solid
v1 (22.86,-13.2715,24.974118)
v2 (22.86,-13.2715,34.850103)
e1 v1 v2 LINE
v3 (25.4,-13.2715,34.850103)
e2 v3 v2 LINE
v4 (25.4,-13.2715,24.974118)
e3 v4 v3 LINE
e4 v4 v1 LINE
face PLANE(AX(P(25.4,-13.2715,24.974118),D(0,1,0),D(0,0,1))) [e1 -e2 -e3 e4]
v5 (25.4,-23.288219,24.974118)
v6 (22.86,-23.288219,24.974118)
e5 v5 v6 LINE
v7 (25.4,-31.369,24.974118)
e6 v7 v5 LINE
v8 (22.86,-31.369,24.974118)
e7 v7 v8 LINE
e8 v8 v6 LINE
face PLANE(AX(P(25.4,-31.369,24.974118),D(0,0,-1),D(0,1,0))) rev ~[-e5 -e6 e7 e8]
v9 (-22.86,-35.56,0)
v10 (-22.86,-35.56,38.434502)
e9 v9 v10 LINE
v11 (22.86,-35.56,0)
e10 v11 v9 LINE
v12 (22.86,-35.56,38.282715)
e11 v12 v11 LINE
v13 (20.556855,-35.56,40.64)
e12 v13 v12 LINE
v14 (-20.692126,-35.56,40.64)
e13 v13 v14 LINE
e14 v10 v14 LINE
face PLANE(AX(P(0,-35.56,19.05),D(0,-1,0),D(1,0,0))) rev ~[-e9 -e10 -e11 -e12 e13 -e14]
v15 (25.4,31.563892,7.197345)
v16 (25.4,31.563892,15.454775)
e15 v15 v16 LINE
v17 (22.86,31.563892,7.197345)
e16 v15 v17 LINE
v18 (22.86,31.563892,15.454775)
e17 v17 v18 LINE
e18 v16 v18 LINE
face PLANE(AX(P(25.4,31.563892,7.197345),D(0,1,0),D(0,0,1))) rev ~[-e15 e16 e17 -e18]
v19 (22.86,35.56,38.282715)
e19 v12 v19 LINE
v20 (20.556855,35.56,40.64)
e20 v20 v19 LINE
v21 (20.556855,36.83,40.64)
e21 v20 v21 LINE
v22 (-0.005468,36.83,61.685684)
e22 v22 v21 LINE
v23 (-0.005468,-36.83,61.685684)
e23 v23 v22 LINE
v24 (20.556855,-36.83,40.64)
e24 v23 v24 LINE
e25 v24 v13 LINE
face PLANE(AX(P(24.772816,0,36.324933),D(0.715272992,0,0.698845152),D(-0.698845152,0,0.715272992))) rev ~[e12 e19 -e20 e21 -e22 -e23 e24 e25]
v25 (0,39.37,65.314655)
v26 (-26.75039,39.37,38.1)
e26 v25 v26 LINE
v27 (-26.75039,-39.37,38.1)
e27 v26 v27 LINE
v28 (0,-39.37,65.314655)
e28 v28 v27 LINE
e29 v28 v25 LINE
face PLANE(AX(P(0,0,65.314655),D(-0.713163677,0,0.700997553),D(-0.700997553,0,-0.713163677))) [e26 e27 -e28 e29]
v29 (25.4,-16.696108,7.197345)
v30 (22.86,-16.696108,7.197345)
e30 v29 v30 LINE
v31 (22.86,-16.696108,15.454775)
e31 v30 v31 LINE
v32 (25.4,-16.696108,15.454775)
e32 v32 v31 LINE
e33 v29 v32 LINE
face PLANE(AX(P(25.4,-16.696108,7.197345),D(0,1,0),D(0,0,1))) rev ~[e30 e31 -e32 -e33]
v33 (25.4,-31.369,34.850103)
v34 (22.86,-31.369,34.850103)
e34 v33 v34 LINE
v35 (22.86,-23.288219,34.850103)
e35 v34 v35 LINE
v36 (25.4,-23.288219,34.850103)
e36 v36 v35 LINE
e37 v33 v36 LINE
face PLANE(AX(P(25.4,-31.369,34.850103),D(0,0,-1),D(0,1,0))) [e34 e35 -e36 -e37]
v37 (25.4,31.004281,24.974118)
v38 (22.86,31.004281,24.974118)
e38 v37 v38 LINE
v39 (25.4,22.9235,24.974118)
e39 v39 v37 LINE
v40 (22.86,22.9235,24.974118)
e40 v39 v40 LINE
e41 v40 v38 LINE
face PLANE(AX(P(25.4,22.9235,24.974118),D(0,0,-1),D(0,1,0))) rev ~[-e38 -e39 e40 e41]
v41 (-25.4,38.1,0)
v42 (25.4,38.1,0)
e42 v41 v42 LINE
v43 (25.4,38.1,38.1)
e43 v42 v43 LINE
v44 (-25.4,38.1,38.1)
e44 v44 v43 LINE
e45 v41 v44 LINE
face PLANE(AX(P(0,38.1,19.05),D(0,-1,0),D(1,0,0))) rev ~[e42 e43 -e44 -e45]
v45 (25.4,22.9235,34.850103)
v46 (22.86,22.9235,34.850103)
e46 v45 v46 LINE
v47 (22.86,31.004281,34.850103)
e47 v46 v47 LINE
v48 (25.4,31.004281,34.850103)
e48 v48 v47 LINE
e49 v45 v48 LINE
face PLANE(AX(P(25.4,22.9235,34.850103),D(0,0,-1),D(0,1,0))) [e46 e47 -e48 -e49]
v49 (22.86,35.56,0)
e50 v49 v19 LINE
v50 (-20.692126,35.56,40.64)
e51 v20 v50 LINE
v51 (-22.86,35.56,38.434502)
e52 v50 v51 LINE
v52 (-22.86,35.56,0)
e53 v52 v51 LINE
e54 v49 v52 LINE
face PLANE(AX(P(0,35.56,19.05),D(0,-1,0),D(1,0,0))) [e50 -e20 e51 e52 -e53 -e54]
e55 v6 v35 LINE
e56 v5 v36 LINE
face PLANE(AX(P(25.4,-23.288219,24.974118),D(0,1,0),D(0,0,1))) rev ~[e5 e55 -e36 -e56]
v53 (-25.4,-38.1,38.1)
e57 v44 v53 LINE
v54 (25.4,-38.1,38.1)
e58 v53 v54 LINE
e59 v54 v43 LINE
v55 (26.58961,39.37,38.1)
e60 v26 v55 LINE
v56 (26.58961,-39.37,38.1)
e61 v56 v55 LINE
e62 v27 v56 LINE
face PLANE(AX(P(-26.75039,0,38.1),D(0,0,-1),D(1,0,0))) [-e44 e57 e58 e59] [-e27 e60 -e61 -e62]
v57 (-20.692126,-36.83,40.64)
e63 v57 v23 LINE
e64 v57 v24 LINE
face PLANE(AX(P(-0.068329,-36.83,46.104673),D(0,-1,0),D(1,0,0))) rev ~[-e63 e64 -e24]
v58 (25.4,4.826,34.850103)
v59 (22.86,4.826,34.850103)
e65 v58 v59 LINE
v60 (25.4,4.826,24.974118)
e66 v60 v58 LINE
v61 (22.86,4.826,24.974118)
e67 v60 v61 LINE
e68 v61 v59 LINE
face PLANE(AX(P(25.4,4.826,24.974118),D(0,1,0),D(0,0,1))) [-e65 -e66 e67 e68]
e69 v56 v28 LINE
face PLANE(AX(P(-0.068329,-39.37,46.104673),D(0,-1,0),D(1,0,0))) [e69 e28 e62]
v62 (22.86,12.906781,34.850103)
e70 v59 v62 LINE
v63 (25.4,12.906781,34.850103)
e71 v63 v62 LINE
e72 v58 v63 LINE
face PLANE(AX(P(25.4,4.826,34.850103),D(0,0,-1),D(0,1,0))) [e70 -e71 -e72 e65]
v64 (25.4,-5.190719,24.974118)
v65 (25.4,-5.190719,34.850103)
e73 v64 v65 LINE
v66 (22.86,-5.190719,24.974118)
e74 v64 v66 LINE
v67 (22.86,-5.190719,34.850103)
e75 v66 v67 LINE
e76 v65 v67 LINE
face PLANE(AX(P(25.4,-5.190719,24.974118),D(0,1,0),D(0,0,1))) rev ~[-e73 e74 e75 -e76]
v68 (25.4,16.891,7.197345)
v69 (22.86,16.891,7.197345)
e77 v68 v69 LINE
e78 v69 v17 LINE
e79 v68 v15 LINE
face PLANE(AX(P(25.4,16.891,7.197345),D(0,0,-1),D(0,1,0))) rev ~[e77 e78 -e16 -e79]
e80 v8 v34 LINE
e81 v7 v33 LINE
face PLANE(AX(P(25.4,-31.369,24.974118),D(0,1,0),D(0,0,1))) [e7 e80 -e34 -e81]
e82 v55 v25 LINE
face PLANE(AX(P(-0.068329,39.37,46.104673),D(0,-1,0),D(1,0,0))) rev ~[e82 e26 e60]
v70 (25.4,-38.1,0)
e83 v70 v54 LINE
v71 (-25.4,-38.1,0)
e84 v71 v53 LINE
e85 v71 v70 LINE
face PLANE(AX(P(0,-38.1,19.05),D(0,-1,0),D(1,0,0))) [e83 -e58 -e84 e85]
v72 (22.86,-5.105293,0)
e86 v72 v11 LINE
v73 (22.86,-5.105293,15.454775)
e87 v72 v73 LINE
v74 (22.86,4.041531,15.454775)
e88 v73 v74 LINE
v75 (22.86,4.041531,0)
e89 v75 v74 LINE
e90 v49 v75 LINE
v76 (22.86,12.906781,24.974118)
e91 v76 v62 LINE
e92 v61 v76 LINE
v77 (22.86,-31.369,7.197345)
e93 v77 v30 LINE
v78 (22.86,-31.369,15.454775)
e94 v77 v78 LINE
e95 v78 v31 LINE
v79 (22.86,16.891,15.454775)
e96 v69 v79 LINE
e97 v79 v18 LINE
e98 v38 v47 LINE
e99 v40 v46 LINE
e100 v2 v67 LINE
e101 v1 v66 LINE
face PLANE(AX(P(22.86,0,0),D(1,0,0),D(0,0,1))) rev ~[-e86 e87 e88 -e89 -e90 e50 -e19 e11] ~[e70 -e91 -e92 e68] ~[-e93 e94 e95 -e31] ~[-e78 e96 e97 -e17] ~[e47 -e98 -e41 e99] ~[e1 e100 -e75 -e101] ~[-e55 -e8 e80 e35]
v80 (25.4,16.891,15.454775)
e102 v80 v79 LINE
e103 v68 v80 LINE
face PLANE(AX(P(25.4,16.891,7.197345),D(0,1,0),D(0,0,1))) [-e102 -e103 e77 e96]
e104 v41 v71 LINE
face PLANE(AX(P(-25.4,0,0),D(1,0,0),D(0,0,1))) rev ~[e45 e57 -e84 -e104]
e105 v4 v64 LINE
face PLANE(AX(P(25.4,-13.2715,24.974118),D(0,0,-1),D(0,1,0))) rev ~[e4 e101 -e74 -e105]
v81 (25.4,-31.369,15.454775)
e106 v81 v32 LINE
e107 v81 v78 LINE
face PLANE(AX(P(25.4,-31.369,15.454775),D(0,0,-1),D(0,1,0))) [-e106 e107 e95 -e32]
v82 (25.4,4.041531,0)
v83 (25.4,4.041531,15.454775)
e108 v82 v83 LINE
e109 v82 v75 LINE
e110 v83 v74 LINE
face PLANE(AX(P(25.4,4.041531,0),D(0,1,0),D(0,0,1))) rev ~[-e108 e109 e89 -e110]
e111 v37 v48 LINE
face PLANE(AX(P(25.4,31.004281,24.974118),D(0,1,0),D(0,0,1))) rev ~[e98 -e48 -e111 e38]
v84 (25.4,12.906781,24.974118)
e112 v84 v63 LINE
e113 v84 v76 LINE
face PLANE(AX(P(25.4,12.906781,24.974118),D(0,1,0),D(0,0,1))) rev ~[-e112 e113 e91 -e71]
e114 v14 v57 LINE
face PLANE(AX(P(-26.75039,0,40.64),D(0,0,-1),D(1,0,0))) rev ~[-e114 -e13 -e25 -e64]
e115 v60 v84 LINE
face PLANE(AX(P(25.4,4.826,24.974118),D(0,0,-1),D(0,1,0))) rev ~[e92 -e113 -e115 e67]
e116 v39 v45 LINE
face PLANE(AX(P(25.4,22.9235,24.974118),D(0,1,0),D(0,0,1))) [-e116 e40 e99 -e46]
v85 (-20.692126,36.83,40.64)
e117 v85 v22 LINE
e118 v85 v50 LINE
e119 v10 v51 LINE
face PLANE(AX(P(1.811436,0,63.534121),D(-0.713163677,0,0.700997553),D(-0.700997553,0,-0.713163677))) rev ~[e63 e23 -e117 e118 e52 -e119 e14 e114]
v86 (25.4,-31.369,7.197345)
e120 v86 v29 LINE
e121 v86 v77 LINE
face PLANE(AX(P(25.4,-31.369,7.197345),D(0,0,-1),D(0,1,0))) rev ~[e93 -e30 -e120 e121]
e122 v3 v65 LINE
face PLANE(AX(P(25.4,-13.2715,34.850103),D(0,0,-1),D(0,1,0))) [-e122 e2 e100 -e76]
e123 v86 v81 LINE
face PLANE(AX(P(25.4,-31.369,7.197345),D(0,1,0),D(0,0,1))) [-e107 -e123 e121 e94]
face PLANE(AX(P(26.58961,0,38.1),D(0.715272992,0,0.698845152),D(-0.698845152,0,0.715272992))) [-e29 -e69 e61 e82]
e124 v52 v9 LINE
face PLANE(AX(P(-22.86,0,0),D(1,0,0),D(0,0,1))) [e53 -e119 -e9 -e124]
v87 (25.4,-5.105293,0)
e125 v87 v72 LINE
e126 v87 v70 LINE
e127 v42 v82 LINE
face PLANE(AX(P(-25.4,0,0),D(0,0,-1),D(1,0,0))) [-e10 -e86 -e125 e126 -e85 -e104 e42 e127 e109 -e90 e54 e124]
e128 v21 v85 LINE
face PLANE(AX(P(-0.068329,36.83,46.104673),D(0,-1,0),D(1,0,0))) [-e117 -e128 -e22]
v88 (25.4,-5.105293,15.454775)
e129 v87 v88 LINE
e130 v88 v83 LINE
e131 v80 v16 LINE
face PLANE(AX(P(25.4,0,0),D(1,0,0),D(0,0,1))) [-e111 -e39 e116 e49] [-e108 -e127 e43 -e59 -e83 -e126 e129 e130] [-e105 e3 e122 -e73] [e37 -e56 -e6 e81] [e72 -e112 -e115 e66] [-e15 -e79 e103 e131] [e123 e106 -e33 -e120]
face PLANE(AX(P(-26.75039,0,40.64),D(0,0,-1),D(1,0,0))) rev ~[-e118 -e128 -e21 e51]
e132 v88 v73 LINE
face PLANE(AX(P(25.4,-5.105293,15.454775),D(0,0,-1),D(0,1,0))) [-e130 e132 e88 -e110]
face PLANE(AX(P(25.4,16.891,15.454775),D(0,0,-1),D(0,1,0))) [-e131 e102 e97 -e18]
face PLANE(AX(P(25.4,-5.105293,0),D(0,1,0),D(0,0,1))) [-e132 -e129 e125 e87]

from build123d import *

# Parameters (mm, degrees)
F0_W          = 50.8
F0_H          = 38.1
F2_DEPTH      = 38.1
F2_DEPTH_BACK = 38.1
F3_DEPTH      = 39.37
F3_DEPTH_BACK = 39.37
F4_T          = -2.54
F6_W          = 9.1468244791
F6_H          = 15.4547751881
F6_W_2        = 8.080781489
F6_H_2        = 9.8759858869
F6_W_3        = 14.6728920285
F6_H_3        = 8.2574296976
F7_DEPTH      = 2.54


# Not quite as in the source:
# - the program builds the solid bodies; features that only make, move or delete a surface that nothing else refers to are left out


with BuildPart() as f2:
    # F0 (on Front) → F2 (new body, two sides)
    with BuildSketch(Plane.XZ) as f2_sk:
        with Locations((0, 19.05)):
            Rectangle(F0_W, F0_H)
    extrude(amount=F2_DEPTH)
    extrude(f2_sk.sketch, amount=-F2_DEPTH_BACK)

    # F1 (on Front) → F3 (join, two sides)
    with BuildSketch(Plane.XZ) as f3_sk:
        Polygon((0, 65.3146550722), (-26.7503901826, 38.1), (26.5896098174, 38.1), align=None)
    extrude(amount=F3_DEPTH)
    extrude(f3_sk.sketch, amount=-F3_DEPTH_BACK)

    # F4
    f4_openings = [f2.faces().sort_by_distance(p)[0] for p in [
        (0, 0, 0),
    ]]
    offset(amount=F4_T, openings=f4_openings, kind=Kind.INTERSECTION)

    # F6 (on offset) → F7 (cut)
    with BuildSketch(Plane.YZ.offset(25.4)):
        with Locations((-0.5318810698, 7.7273875941)):
            Rectangle(F6_W, F6_H)
        with Locations((-27.3286092555, 29.9121104646)):
            Rectangle(F6_W_2, F6_H_2)
        with Locations((-9.2311092555, 29.9121104646)):
            Rectangle(F6_W_2, F6_H_2)
        with Locations((8.8663907445, 29.9121104646)):
            Rectangle(F6_W_2, F6_H_2)
        with Locations((26.9638907445, 29.9121104646)):
            Rectangle(F6_W_2, F6_H_2)
        with Locations((24.2274460142, 11.3260603393)):
            Rectangle(F6_W_3, F6_H_3)
        with Locations((-24.0325539858, 11.3260603393)):
            Rectangle(F6_W_3, F6_H_3)
    extrude(amount=-F7_DEPTH, mode=Mode.SUBTRACT)


solid = f2.part
